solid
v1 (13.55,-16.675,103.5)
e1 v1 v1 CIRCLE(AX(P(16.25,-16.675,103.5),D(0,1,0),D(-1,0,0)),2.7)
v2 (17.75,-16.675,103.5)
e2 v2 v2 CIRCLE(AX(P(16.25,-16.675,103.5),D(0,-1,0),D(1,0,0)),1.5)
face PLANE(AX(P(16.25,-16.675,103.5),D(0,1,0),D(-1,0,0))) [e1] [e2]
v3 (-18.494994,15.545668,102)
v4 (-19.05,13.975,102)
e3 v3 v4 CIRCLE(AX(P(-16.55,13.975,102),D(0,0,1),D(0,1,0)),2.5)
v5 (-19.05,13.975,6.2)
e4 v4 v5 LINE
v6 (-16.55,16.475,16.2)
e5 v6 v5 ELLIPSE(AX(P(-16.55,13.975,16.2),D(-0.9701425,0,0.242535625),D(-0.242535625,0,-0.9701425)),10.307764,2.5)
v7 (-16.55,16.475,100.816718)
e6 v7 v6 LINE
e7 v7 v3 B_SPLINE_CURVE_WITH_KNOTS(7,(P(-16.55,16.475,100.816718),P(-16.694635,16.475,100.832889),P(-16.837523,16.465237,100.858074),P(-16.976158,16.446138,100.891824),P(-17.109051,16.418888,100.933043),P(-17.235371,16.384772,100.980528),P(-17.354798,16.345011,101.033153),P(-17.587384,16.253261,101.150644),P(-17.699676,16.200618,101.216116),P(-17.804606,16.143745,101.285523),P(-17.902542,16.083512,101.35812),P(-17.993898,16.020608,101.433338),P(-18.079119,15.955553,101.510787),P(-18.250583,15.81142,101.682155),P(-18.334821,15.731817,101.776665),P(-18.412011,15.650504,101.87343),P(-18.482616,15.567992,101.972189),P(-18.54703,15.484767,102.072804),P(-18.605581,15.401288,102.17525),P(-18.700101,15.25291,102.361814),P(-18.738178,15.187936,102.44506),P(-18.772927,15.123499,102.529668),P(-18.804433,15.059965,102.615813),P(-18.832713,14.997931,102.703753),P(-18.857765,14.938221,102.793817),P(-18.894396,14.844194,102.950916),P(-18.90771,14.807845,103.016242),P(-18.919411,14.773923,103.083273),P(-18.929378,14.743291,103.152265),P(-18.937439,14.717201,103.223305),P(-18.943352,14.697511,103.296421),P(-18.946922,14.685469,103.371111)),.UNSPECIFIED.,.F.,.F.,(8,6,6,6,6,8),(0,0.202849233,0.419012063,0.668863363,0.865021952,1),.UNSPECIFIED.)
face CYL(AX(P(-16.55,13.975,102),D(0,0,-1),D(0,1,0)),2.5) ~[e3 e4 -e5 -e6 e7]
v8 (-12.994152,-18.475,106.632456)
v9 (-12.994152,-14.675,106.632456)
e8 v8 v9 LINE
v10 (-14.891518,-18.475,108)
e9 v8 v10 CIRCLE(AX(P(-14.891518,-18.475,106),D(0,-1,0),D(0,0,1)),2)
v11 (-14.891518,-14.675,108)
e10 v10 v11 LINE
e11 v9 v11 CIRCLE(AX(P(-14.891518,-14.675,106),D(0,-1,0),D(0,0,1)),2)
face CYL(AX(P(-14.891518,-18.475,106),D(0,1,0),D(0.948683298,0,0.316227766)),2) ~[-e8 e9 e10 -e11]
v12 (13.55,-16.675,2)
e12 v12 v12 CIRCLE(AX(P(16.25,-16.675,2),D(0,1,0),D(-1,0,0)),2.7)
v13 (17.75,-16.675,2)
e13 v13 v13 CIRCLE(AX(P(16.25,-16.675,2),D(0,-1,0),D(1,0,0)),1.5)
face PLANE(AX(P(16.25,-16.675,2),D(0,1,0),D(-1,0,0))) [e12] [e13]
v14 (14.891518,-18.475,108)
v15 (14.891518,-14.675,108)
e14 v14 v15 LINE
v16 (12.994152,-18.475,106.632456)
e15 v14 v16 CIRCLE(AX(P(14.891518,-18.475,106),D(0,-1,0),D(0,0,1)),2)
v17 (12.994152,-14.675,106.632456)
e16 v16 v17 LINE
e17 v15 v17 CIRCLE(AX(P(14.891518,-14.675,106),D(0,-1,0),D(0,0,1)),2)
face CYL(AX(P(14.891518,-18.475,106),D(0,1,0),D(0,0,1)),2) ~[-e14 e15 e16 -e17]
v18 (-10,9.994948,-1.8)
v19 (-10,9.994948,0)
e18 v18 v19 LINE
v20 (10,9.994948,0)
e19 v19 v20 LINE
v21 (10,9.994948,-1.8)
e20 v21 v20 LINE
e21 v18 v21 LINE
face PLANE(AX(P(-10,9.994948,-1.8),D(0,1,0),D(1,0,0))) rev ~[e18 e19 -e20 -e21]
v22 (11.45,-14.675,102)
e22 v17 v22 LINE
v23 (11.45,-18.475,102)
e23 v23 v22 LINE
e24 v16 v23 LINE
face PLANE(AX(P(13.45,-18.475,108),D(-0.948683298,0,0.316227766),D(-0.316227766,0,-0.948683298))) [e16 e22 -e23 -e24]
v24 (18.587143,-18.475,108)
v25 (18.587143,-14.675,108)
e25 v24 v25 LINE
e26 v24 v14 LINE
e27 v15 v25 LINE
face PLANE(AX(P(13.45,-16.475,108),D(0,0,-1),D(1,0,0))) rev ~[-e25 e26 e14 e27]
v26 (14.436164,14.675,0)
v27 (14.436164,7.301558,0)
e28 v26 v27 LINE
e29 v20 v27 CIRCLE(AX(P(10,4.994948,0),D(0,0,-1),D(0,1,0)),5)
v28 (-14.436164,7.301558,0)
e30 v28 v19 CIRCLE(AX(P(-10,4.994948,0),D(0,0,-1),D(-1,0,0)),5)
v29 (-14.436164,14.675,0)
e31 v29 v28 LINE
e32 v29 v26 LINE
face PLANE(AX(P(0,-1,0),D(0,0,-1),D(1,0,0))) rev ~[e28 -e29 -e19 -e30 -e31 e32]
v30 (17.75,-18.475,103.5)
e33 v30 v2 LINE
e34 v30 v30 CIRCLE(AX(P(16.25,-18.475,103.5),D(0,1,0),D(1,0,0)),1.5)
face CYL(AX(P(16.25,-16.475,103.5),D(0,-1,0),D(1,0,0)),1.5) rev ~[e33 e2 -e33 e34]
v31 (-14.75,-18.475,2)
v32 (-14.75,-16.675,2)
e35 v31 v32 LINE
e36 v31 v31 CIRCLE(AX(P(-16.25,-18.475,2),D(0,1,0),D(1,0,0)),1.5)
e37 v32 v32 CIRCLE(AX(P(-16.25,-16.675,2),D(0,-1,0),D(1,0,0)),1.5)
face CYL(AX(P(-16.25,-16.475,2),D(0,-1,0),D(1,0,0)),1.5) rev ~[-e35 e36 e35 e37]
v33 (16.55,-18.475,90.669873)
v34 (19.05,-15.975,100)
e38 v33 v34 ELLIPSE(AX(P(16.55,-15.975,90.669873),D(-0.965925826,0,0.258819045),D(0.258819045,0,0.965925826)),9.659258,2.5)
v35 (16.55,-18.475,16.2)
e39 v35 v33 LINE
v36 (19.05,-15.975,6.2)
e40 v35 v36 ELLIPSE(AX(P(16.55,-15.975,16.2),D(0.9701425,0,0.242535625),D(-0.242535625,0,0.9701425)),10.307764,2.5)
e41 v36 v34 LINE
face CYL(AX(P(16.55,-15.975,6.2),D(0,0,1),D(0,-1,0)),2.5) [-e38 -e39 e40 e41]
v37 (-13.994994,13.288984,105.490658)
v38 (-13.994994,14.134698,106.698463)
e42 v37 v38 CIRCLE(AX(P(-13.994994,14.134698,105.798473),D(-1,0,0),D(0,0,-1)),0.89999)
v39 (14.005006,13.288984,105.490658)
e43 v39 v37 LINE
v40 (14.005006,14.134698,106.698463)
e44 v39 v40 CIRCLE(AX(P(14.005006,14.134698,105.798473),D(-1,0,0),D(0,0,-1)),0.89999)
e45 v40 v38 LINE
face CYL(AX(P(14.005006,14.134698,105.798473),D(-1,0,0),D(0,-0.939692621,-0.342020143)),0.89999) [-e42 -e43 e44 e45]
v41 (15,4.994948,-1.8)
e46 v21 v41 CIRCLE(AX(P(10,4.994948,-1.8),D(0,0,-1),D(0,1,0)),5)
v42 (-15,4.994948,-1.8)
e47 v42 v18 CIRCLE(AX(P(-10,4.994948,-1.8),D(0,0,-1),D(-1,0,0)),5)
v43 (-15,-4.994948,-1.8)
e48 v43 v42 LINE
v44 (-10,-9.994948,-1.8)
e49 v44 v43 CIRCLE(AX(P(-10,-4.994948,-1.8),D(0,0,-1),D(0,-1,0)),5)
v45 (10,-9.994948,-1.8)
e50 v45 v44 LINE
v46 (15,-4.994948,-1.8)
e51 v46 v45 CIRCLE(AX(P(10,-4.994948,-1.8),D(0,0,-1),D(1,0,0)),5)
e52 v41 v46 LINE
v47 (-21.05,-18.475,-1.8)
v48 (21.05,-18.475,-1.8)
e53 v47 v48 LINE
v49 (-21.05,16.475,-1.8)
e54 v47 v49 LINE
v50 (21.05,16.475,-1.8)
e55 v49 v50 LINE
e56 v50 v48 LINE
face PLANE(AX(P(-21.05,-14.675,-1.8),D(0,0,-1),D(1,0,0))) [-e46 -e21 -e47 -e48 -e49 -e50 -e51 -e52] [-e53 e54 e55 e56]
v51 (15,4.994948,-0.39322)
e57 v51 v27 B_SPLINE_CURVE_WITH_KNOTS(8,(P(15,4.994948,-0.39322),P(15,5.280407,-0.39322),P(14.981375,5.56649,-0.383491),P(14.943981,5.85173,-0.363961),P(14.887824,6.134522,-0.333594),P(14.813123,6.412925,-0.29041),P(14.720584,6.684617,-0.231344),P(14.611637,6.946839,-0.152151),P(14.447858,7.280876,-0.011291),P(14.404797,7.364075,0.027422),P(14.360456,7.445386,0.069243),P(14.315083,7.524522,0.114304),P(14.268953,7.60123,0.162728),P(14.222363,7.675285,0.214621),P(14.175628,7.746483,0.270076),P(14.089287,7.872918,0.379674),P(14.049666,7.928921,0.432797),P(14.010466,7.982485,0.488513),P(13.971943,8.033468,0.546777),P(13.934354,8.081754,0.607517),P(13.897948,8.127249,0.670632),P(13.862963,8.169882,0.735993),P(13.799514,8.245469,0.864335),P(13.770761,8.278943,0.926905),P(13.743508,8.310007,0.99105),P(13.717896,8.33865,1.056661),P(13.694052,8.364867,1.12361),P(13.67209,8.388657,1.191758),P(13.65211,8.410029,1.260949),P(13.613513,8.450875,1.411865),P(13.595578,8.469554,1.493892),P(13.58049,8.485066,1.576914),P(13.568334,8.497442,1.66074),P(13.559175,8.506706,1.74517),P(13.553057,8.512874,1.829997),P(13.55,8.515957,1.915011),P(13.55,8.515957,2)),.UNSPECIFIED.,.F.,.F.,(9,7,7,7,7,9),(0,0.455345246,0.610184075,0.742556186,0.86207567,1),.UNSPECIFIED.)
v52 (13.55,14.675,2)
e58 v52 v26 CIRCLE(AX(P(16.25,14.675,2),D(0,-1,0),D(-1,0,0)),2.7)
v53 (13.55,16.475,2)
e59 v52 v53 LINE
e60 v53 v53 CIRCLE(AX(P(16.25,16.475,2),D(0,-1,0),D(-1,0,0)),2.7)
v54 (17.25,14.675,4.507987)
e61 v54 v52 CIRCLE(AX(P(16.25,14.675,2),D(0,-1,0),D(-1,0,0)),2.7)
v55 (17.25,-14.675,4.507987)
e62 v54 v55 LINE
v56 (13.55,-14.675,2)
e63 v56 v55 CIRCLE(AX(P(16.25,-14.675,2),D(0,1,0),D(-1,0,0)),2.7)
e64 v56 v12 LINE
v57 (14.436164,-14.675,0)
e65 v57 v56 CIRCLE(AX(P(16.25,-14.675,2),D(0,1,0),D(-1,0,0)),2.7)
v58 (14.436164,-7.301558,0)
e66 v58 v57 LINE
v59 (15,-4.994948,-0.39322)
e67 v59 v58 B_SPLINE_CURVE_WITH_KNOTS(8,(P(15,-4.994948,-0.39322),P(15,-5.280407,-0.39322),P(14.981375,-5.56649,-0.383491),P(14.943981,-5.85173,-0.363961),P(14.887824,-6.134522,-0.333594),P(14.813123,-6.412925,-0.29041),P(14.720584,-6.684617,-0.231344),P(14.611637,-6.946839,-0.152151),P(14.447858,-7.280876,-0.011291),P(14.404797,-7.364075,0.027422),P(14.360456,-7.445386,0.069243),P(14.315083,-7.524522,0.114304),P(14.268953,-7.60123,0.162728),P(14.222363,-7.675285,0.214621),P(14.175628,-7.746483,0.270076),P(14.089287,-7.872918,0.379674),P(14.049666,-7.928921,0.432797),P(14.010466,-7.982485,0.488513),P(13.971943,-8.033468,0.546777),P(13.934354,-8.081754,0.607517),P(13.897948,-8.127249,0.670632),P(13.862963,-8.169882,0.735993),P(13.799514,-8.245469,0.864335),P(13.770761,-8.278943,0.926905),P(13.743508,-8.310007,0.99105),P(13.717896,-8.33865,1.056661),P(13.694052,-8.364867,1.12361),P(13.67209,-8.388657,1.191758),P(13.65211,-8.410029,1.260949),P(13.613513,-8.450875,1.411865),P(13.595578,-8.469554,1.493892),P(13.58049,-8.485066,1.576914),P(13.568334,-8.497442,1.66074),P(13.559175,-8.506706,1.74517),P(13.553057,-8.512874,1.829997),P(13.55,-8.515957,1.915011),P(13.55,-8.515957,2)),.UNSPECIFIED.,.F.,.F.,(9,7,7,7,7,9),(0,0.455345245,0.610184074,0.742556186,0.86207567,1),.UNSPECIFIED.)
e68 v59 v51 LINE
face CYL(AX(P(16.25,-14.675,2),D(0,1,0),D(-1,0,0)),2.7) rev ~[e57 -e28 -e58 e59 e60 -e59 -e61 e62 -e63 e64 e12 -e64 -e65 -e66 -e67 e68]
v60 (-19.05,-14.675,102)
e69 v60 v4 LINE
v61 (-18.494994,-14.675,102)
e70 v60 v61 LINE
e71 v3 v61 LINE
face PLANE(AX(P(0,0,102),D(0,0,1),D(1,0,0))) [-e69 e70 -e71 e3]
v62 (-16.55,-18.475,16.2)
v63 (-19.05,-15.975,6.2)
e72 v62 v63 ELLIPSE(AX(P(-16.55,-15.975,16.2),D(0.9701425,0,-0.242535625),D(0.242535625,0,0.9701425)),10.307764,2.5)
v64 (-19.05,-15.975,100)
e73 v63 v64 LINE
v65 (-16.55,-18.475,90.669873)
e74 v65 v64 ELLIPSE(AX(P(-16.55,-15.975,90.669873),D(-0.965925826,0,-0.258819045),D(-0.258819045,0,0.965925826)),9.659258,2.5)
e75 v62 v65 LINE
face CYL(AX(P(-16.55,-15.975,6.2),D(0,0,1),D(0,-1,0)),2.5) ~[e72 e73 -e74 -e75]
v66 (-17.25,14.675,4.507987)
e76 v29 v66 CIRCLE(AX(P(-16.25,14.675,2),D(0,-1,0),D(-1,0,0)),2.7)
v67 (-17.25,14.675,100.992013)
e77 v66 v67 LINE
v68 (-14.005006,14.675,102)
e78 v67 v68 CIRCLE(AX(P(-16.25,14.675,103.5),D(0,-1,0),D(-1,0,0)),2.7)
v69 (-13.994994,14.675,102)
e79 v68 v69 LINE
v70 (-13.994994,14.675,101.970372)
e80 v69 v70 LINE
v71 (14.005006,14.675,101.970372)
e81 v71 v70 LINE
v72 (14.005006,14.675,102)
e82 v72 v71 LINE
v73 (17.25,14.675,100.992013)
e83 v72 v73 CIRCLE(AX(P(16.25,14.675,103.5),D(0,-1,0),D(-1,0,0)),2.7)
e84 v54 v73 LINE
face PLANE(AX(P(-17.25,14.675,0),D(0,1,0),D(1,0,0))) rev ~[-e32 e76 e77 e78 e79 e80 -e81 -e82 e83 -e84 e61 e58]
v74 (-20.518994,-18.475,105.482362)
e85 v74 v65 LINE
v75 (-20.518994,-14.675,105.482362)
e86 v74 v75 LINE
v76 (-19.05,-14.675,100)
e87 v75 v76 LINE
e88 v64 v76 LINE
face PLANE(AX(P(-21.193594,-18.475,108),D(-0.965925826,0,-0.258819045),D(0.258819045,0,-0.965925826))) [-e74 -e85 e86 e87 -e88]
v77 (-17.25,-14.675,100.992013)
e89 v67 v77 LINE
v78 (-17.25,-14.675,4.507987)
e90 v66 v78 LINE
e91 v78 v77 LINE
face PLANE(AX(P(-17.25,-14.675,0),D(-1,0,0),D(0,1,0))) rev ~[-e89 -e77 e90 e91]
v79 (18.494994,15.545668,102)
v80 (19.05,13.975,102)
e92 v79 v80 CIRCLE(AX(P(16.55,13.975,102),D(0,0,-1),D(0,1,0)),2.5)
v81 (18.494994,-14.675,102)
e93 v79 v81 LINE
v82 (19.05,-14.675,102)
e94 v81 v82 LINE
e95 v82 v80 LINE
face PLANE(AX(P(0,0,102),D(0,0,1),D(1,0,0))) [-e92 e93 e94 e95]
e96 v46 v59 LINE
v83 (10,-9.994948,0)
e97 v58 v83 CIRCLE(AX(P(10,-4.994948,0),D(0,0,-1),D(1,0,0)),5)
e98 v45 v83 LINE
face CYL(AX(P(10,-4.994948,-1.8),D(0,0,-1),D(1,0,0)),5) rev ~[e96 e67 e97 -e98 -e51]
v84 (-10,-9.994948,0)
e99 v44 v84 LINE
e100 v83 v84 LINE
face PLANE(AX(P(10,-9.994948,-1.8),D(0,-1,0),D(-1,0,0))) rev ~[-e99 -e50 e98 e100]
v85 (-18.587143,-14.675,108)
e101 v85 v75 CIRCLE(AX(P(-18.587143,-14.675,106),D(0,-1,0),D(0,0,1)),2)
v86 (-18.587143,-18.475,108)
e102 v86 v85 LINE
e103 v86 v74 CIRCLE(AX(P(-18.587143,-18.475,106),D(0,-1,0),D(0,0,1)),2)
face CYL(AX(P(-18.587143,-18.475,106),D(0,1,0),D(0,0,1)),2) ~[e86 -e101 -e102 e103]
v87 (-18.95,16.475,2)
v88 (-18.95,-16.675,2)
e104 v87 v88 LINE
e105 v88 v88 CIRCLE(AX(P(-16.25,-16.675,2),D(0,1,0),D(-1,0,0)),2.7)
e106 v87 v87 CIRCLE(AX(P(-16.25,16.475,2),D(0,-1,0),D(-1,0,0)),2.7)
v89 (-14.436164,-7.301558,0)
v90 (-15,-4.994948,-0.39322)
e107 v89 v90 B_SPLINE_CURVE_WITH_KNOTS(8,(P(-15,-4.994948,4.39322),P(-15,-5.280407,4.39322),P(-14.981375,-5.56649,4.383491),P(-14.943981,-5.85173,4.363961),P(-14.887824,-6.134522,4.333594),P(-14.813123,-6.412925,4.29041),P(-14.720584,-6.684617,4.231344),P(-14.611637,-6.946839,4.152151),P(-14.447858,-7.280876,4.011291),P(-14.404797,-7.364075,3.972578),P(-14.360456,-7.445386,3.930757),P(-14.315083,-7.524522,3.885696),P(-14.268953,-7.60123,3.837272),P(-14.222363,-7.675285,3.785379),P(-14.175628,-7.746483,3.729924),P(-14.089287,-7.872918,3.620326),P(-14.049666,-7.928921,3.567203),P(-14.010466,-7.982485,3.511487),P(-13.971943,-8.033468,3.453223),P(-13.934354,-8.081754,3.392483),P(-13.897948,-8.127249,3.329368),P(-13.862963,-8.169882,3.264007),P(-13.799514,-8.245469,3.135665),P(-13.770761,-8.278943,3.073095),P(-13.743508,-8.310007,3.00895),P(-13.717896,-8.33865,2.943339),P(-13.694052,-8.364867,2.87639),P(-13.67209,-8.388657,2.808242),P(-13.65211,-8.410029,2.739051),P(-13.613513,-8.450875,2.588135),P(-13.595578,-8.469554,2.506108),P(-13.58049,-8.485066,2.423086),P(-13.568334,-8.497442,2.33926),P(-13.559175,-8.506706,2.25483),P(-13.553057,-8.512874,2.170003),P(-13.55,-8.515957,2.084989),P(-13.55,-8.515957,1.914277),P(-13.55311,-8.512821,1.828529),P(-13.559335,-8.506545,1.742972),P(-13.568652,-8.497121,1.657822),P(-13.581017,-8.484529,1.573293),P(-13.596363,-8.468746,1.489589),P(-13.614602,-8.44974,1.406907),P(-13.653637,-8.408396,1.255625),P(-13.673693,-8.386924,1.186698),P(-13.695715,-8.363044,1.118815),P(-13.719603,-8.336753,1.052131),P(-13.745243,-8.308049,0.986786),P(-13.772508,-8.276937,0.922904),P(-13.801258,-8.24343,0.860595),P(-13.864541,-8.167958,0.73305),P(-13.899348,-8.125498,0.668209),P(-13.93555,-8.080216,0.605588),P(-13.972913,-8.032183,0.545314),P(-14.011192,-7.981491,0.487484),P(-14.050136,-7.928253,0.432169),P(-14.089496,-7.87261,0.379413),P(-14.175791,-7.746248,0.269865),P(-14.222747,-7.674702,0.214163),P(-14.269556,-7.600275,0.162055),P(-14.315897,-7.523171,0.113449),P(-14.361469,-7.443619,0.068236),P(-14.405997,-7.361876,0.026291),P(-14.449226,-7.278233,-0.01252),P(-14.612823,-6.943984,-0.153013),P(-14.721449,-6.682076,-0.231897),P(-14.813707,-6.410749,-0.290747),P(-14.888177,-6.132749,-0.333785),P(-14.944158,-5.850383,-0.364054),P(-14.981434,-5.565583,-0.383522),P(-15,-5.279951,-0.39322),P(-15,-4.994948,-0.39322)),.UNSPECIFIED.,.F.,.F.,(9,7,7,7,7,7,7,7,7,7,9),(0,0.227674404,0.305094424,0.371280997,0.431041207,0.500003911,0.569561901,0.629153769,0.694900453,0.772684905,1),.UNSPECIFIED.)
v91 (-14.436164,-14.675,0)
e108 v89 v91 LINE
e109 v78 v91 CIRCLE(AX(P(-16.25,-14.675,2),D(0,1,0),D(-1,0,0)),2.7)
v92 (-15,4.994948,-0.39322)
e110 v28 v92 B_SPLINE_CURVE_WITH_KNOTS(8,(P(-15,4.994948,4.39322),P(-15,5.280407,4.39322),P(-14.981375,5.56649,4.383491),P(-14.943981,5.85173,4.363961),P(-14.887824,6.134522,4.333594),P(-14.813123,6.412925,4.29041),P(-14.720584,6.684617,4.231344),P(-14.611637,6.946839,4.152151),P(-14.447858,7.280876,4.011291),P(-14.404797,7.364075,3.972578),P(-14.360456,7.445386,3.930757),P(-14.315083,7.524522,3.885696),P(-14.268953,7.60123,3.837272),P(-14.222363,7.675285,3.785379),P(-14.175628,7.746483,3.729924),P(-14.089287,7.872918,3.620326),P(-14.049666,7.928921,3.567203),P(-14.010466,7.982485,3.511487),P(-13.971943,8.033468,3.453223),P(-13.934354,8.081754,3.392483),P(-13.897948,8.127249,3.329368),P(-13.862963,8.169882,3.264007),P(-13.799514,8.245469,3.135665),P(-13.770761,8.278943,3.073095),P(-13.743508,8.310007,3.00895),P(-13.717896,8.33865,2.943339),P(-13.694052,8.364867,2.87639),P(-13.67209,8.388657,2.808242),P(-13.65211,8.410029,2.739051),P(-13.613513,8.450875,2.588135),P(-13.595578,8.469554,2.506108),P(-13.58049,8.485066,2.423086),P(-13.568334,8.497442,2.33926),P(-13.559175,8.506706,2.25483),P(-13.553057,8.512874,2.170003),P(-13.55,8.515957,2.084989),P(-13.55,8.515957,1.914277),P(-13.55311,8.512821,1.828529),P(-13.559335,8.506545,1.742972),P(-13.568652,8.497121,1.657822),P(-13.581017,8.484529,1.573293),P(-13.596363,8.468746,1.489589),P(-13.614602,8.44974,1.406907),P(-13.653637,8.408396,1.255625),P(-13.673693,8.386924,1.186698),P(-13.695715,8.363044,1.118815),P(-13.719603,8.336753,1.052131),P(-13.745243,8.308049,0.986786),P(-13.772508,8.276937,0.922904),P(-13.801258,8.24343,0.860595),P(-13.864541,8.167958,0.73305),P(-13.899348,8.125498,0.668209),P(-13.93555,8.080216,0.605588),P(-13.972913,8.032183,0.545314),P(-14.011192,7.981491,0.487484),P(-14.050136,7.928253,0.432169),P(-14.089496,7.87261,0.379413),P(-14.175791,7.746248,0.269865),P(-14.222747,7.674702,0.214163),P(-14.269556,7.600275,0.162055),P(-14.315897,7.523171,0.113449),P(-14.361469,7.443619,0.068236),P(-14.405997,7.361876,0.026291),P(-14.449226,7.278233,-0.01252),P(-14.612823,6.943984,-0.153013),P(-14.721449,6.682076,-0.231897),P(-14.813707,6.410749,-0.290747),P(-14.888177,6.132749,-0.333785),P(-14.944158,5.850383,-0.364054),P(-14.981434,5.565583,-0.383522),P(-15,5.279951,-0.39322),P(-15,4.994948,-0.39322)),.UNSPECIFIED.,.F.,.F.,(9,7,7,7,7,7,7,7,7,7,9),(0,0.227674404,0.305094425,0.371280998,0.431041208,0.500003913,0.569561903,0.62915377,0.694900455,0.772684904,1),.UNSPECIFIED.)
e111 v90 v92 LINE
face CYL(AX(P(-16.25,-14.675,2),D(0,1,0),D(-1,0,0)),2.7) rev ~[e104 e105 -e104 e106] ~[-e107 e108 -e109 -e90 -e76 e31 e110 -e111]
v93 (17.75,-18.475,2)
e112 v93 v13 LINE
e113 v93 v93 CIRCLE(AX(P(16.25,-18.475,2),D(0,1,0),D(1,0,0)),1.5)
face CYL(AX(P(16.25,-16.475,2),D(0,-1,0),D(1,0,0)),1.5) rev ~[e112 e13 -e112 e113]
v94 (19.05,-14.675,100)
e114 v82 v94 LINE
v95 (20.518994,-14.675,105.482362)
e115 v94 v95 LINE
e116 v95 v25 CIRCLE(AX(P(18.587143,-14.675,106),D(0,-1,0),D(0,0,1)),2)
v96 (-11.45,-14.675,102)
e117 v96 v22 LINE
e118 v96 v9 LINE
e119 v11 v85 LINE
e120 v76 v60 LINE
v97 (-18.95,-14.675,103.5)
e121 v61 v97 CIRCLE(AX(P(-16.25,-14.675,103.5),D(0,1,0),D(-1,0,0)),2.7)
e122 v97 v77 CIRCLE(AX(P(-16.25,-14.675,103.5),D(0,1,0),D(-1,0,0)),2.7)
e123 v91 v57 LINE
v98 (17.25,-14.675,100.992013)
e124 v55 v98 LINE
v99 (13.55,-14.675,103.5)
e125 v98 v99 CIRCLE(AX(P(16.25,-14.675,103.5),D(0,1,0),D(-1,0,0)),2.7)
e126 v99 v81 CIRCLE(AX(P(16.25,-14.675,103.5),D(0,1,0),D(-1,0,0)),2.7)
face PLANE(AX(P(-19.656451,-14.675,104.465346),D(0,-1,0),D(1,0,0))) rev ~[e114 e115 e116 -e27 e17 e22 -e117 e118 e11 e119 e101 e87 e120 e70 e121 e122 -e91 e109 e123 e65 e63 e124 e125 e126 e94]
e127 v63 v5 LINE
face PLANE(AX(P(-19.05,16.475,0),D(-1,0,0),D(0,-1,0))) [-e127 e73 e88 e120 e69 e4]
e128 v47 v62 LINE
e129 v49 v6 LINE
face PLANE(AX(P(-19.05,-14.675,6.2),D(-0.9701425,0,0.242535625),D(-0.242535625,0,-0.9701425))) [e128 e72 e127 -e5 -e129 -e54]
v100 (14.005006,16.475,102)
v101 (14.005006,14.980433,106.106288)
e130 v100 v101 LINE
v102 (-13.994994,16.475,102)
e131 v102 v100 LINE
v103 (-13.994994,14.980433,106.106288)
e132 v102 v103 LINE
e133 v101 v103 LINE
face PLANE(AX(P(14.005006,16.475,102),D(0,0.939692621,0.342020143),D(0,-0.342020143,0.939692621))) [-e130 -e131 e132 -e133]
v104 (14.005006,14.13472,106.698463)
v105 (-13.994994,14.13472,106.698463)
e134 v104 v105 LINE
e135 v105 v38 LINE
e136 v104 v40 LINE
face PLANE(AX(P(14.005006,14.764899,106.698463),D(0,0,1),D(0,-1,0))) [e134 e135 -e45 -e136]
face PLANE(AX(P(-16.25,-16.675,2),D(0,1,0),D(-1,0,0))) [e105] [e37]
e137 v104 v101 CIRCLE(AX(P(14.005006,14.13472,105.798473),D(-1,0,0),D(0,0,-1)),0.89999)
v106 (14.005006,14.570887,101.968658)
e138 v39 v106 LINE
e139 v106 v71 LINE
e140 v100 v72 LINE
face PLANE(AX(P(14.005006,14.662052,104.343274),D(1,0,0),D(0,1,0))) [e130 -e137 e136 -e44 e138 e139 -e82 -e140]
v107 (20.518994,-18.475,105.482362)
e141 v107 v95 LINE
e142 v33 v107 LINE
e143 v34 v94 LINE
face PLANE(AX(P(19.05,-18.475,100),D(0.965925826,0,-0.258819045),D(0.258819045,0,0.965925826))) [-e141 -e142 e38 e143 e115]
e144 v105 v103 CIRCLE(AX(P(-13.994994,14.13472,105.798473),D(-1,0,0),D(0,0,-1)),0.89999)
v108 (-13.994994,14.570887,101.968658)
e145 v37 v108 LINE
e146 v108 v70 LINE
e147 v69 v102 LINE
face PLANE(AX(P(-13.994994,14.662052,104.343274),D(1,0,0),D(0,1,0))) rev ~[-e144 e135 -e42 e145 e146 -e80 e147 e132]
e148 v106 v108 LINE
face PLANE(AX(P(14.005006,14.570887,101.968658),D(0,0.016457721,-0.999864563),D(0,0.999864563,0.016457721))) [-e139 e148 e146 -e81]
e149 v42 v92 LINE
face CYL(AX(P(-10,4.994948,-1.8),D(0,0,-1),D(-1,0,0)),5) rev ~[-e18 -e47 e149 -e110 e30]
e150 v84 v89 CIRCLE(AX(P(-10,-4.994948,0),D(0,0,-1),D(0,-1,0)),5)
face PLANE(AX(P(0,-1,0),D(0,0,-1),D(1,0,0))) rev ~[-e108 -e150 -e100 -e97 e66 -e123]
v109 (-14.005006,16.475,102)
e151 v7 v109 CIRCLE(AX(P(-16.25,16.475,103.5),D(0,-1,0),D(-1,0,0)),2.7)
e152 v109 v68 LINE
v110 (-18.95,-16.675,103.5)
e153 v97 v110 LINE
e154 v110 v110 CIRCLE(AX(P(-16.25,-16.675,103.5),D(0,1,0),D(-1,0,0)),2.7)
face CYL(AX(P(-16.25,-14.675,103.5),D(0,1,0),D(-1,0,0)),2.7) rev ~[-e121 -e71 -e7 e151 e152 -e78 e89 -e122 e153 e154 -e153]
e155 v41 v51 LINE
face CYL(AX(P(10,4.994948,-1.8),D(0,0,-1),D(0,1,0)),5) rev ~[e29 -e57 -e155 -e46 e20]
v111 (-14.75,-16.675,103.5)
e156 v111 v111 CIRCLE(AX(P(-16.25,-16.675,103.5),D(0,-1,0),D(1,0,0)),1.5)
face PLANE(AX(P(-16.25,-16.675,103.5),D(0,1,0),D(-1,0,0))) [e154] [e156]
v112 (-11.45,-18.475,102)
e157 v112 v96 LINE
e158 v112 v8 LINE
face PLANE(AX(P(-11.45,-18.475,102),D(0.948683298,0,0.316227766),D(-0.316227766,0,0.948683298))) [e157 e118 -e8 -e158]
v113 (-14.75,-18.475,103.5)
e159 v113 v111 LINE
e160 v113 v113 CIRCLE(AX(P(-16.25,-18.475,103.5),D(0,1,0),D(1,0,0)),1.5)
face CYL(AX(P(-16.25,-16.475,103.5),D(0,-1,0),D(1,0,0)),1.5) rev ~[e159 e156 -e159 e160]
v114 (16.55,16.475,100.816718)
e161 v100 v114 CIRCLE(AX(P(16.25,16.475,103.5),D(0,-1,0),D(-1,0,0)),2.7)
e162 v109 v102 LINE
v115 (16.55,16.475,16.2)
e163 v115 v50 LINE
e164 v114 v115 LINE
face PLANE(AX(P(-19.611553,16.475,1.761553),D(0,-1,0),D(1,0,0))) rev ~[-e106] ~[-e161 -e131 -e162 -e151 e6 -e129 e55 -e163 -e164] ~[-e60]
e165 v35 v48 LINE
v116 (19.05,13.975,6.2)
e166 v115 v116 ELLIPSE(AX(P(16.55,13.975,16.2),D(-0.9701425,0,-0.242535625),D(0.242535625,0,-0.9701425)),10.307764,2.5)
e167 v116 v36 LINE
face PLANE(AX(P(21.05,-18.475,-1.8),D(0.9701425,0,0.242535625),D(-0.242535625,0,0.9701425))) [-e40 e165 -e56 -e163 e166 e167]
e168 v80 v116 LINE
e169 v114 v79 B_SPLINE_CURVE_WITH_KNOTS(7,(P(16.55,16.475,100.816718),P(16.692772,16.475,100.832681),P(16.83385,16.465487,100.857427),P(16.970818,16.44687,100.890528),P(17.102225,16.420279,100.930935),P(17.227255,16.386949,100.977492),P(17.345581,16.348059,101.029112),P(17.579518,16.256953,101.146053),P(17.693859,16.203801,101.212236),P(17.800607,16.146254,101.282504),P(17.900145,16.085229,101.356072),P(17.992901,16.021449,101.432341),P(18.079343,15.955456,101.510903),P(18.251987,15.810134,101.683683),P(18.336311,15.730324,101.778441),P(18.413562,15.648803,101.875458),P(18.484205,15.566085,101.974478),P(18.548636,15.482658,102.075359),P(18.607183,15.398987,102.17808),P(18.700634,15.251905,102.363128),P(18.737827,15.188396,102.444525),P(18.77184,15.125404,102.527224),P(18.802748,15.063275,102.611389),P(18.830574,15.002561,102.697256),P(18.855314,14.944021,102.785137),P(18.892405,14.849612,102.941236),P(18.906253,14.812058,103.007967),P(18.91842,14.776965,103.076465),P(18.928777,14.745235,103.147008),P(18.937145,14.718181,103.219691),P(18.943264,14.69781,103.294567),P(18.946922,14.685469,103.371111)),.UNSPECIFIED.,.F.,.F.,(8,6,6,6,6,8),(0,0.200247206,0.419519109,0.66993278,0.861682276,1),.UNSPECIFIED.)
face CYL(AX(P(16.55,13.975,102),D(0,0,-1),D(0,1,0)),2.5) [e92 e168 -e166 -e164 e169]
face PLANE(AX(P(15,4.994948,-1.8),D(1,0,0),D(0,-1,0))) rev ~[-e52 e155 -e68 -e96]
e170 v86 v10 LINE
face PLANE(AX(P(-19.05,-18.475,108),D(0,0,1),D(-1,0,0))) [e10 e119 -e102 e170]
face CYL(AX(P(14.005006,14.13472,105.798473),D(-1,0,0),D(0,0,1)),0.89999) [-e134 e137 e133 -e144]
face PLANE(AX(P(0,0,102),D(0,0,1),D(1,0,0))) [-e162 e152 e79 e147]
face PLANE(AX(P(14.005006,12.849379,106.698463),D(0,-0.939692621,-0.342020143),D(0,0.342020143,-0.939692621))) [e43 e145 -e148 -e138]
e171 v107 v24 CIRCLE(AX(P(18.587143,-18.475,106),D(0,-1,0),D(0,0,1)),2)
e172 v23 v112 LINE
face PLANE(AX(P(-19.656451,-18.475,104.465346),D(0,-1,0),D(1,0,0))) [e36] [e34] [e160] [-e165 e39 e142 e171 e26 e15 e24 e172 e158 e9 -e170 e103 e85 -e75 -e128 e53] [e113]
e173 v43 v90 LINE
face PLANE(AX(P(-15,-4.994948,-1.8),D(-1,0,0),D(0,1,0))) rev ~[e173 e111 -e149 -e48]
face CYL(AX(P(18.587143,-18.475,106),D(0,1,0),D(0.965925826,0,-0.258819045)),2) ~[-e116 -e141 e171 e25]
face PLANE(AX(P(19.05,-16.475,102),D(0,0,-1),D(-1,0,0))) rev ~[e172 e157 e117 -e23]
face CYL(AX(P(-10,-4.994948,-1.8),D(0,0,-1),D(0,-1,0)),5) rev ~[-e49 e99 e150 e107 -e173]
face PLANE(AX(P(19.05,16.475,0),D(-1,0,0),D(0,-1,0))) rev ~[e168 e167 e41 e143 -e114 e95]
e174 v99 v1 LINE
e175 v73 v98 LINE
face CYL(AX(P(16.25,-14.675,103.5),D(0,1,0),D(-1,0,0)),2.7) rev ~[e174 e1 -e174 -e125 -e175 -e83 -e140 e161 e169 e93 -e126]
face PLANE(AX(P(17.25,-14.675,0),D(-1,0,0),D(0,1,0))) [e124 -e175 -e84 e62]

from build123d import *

# Parameters (mm, degrees)
F3_W           = 38.1
F3_H           = 32.95
F3_W_2         = 34.5
F3_H_2         = 29.35
F4_DEPTH       = 102
F6_W           = 5.6
F6_H           = 6
F7_DEPTH       = 1.8
F5_R           = 1.5
F9_DEPTH       = 2
F10_DEPTH      = 32.951
F10_DEPTH_BACK = 25
F11_W          = 38.1
F11_H          = 34.95
F12_DEPTH      = 1.8
F14_DEPTH      = 3.8
F15_R          = 2.7
F16_DEPTH      = 2
F16_DEPTH_BACK = 31.151
F17_DEPTH      = 31.15
F19_DEPTH      = 25
F20_R          = 2.5
F21_R          = 2
F24_DEPTH      = 28
F25_R          = 0.89999


# Not quite as in the source:
# - a fillet or chamfer is up to 0.001 mm smaller than in the source, because OpenCascade refuses the exact size


with BuildPart() as f4:
    # F3 (on Top) → F4 (new body)
    with BuildSketch(Plane.XY):
        Rectangle(F3_W, F3_H)
        Rectangle(F3_W_2, F3_H_2, mode=Mode.SUBTRACT)
    extrude(amount=F4_DEPTH)


with BuildPart() as f7:
    # F6 (on face) → F7 (new body)
    with BuildSketch(Plane.XZ.offset(16.475)):
        with Locations((-16.25, 105)):
            Rectangle(F6_W, F6_H)
    extrude(amount=-F7_DEPTH)


with BuildPart() as f7b:
    # F6 (on face) → F7, piece 2 (new body)
    with BuildSketch(Plane.XZ.offset(16.475)):
        with Locations((16.25, 105)):
            Rectangle(F6_W, F6_H)
    extrude(amount=-F7_DEPTH)


with BuildPart() as f4_1:
    add(f4.part)

    # F8: union F7, F7b
    add(f7.part)
    add(f7b.part)

    # F5 (on face) + F8_face (on face) → F9 (join)
    with BuildSketch(Plane.XZ.offset(16.475)):
        Polygon((16.25, 102), (-16.2500000167, 102), (-19.05, 102), (-19.05, 0), (19.05, 0), (19.05, 102), align=None)
        with Locations((-16.25, 2)):
            Circle(F5_R, mode=Mode.SUBTRACT)
        with Locations((16.25, 2)):
            Circle(F5_R, mode=Mode.SUBTRACT)
    with BuildSketch(Plane(origin=(0, -16.475, 51.9178934588), x_dir=(1, 0, 0), z_dir=(0, -1, 0))):
        Polygon((-19.05, 56.0821065412), (-19.05, -51.9178934588), (19.05, -51.9178934588), (19.05, 56.0821065412), (13.45, 56.0821065412), (13.45, 50.0821065412), (-13.45, 50.0821065412), (-13.45, 56.0821065412), align=None)
    extrude(amount=F9_DEPTH)

    # F5 (on face) → F10 (cut, two sides)
    with BuildSketch(Plane.XZ.offset(16.475)) as f10_sk:
        with Locations((-16.25, 2)):
            Circle(F5_R)
        with Locations((-16.25, 103.5)):
            Circle(F5_R)
        with Locations((16.25, 103.5)):
            Circle(F5_R)
        with Locations((16.25, 2)):
            Circle(F5_R)
    extrude(amount=-F10_DEPTH, mode=Mode.SUBTRACT)
    extrude(f10_sk.sketch, amount=F10_DEPTH_BACK, mode=Mode.SUBTRACT)

    # F11 (on face) → F12 (join)
    with BuildSketch(Plane(origin=(0, 0, 0), x_dir=(1, 0, 0), z_dir=(0, 0, -1))):
        with Locations((0, 1)):
            Rectangle(F11_W, F11_H)
    extrude(amount=F12_DEPTH)

    # F13 (on face) → F14 (join)
    with BuildSketch(Plane.XZ.offset(18.475)):
        Polygon((-19.05, 100), (-19.05, 108), (-21.1935935394, 108), align=None)
        Polygon((-21.05, -1.8), (-19.05, -1.8), (-19.05, 6.2), align=None)
        Polygon((21.05, -1.8), (19.05, 6.2), (19.05, -1.8), align=None)
        Polygon((21.1935935394, 108), (19.05, 108), (19.05, 100), align=None)
        Polygon((13.45, 102), (13.45, 108), (11.45, 102), align=None)
        Polygon((-13.45, 102), (-11.45, 102), (-13.45, 108), align=None)
    extrude(amount=-F14_DEPTH)

    # F15 (on face) → F16 (cut, two sides)
    with BuildSketch(Plane(origin=(0, -14.675, 0), x_dir=(-1, 0, 0), z_dir=(0, 1, 0))) as f16_sk:
        with Locations((-16.25, 103.5)):
            Circle(F15_R)
        with Locations((16.25, 103.5)):
            Circle(F15_R)
        with Locations((-16.25, 2)):
            Circle(F15_R)
        with Locations((16.25, 2)):
            Circle(F15_R)
    extrude(amount=-F16_DEPTH, mode=Mode.SUBTRACT)
    extrude(f16_sk.sketch, amount=F16_DEPTH_BACK, mode=Mode.SUBTRACT)

    # F17 (add, through all): faces of the model
    f17_faces = [f4_1.faces().sort_by_distance(p)[0] for p in [
        (-19.7166666667, -14.675, 0.8666666667),
        (19.7166666667, -14.675, 0.8666666667),
    ]]
    extrude(f17_faces, amount=F17_DEPTH)

    # F18 (on face) → F19 (cut)
    with BuildSketch(Plane(origin=(0, 0, -1.8), x_dir=(1, 0, 0), z_dir=(0, 0, -1))):
        with BuildLine():
            Line((10, 9.9949482828), (0, 9.9949482828))
            Line((0, 9.9949482828), (0, 0))
            Line((0, 0), (15, 0))
            Line((15, 0), (15, 4.9949482828))
            ThreePointArc((15, 4.9949482828), (13.5355339059, 8.5304821888), (10, 9.9949482828))
        make_face()
        with BuildLine():
            Line((0, 0), (0, 9.9949482828))
            Line((0, 9.9949482828), (-10, 9.9949482828))
            ThreePointArc((-10, 9.9949482828), (-13.5355339059, 8.5304821888), (-15, 4.9949482828))
            Line((-15, 4.9949482828), (-15, 0))
            Line((-15, 0), (0, 0))
        make_face()
        with BuildLine():
            Line((15, 0), (0, 0))
            Line((0, 0), (0, -9.9949482828))
            Line((0, -9.9949482828), (10, -9.9949482828))
            ThreePointArc((10, -9.9949482828), (13.5355339059, -8.5304821888), (15, -4.9949482828))
            Line((15, -4.9949482828), (15, 0))
        make_face()
        with BuildLine():
            Line((0, -9.9949482828), (0, 0))
            Line((0, 0), (-15, 0))
            Line((-15, 0), (-15, -4.9949482828))
            ThreePointArc((-15, -4.9949482828), (-13.5355339059, -8.5304821888), (-10, -9.9949482828))
            Line((-10, -9.9949482828), (0, -9.9949482828))
        make_face()
    extrude(amount=-F19_DEPTH, mode=Mode.SUBTRACT)

    # F20
    f20_edges = [f4_1.edges().sort_by_distance(p)[0] for p in [
        (-19.05, 16.475, 54.1),
        (19.05, 16.475, 54.1),
        (19.05, -18.475, 53.1),
        (-19.05, -18.475, 53.1),
    ]]
    fillet(f20_edges, radius=F20_R)

    # F21
    f21_edges = [f4_1.edges().sort_by_distance(p)[0] for p in [
        (-13.45, -16.575, 108),
        (-21.193594, -16.575, 108),
        (13.45, -16.575, 108),
        (21.193594, -16.575, 108),
    ]]
    fillet(f21_edges, radius=F21_R)

    # F23 (on face) → F24 (join)
    with BuildSketch(Plane.YZ.offset(14.0050055679)):
        Polygon((14.5708874184, 101.9686584017), (16.475, 102), (14.7648992834, 106.6984631039), (12.8493792929, 106.6984631039), align=None)
    extrude(amount=-F24_DEPTH)

    # F25 (radius 0.9 in the source; OpenCascade refuses exactly that, so slightly less here)
    f25_edges = [f4_1.edges().sort_by_distance(p)[0] for p in [
        (0.005006, 14.764899, 106.698463),
        (0.005006, 12.849379, 106.698463),
    ]]
    fillet(f25_edges, radius=F25_R)


solid = f4_1.part
